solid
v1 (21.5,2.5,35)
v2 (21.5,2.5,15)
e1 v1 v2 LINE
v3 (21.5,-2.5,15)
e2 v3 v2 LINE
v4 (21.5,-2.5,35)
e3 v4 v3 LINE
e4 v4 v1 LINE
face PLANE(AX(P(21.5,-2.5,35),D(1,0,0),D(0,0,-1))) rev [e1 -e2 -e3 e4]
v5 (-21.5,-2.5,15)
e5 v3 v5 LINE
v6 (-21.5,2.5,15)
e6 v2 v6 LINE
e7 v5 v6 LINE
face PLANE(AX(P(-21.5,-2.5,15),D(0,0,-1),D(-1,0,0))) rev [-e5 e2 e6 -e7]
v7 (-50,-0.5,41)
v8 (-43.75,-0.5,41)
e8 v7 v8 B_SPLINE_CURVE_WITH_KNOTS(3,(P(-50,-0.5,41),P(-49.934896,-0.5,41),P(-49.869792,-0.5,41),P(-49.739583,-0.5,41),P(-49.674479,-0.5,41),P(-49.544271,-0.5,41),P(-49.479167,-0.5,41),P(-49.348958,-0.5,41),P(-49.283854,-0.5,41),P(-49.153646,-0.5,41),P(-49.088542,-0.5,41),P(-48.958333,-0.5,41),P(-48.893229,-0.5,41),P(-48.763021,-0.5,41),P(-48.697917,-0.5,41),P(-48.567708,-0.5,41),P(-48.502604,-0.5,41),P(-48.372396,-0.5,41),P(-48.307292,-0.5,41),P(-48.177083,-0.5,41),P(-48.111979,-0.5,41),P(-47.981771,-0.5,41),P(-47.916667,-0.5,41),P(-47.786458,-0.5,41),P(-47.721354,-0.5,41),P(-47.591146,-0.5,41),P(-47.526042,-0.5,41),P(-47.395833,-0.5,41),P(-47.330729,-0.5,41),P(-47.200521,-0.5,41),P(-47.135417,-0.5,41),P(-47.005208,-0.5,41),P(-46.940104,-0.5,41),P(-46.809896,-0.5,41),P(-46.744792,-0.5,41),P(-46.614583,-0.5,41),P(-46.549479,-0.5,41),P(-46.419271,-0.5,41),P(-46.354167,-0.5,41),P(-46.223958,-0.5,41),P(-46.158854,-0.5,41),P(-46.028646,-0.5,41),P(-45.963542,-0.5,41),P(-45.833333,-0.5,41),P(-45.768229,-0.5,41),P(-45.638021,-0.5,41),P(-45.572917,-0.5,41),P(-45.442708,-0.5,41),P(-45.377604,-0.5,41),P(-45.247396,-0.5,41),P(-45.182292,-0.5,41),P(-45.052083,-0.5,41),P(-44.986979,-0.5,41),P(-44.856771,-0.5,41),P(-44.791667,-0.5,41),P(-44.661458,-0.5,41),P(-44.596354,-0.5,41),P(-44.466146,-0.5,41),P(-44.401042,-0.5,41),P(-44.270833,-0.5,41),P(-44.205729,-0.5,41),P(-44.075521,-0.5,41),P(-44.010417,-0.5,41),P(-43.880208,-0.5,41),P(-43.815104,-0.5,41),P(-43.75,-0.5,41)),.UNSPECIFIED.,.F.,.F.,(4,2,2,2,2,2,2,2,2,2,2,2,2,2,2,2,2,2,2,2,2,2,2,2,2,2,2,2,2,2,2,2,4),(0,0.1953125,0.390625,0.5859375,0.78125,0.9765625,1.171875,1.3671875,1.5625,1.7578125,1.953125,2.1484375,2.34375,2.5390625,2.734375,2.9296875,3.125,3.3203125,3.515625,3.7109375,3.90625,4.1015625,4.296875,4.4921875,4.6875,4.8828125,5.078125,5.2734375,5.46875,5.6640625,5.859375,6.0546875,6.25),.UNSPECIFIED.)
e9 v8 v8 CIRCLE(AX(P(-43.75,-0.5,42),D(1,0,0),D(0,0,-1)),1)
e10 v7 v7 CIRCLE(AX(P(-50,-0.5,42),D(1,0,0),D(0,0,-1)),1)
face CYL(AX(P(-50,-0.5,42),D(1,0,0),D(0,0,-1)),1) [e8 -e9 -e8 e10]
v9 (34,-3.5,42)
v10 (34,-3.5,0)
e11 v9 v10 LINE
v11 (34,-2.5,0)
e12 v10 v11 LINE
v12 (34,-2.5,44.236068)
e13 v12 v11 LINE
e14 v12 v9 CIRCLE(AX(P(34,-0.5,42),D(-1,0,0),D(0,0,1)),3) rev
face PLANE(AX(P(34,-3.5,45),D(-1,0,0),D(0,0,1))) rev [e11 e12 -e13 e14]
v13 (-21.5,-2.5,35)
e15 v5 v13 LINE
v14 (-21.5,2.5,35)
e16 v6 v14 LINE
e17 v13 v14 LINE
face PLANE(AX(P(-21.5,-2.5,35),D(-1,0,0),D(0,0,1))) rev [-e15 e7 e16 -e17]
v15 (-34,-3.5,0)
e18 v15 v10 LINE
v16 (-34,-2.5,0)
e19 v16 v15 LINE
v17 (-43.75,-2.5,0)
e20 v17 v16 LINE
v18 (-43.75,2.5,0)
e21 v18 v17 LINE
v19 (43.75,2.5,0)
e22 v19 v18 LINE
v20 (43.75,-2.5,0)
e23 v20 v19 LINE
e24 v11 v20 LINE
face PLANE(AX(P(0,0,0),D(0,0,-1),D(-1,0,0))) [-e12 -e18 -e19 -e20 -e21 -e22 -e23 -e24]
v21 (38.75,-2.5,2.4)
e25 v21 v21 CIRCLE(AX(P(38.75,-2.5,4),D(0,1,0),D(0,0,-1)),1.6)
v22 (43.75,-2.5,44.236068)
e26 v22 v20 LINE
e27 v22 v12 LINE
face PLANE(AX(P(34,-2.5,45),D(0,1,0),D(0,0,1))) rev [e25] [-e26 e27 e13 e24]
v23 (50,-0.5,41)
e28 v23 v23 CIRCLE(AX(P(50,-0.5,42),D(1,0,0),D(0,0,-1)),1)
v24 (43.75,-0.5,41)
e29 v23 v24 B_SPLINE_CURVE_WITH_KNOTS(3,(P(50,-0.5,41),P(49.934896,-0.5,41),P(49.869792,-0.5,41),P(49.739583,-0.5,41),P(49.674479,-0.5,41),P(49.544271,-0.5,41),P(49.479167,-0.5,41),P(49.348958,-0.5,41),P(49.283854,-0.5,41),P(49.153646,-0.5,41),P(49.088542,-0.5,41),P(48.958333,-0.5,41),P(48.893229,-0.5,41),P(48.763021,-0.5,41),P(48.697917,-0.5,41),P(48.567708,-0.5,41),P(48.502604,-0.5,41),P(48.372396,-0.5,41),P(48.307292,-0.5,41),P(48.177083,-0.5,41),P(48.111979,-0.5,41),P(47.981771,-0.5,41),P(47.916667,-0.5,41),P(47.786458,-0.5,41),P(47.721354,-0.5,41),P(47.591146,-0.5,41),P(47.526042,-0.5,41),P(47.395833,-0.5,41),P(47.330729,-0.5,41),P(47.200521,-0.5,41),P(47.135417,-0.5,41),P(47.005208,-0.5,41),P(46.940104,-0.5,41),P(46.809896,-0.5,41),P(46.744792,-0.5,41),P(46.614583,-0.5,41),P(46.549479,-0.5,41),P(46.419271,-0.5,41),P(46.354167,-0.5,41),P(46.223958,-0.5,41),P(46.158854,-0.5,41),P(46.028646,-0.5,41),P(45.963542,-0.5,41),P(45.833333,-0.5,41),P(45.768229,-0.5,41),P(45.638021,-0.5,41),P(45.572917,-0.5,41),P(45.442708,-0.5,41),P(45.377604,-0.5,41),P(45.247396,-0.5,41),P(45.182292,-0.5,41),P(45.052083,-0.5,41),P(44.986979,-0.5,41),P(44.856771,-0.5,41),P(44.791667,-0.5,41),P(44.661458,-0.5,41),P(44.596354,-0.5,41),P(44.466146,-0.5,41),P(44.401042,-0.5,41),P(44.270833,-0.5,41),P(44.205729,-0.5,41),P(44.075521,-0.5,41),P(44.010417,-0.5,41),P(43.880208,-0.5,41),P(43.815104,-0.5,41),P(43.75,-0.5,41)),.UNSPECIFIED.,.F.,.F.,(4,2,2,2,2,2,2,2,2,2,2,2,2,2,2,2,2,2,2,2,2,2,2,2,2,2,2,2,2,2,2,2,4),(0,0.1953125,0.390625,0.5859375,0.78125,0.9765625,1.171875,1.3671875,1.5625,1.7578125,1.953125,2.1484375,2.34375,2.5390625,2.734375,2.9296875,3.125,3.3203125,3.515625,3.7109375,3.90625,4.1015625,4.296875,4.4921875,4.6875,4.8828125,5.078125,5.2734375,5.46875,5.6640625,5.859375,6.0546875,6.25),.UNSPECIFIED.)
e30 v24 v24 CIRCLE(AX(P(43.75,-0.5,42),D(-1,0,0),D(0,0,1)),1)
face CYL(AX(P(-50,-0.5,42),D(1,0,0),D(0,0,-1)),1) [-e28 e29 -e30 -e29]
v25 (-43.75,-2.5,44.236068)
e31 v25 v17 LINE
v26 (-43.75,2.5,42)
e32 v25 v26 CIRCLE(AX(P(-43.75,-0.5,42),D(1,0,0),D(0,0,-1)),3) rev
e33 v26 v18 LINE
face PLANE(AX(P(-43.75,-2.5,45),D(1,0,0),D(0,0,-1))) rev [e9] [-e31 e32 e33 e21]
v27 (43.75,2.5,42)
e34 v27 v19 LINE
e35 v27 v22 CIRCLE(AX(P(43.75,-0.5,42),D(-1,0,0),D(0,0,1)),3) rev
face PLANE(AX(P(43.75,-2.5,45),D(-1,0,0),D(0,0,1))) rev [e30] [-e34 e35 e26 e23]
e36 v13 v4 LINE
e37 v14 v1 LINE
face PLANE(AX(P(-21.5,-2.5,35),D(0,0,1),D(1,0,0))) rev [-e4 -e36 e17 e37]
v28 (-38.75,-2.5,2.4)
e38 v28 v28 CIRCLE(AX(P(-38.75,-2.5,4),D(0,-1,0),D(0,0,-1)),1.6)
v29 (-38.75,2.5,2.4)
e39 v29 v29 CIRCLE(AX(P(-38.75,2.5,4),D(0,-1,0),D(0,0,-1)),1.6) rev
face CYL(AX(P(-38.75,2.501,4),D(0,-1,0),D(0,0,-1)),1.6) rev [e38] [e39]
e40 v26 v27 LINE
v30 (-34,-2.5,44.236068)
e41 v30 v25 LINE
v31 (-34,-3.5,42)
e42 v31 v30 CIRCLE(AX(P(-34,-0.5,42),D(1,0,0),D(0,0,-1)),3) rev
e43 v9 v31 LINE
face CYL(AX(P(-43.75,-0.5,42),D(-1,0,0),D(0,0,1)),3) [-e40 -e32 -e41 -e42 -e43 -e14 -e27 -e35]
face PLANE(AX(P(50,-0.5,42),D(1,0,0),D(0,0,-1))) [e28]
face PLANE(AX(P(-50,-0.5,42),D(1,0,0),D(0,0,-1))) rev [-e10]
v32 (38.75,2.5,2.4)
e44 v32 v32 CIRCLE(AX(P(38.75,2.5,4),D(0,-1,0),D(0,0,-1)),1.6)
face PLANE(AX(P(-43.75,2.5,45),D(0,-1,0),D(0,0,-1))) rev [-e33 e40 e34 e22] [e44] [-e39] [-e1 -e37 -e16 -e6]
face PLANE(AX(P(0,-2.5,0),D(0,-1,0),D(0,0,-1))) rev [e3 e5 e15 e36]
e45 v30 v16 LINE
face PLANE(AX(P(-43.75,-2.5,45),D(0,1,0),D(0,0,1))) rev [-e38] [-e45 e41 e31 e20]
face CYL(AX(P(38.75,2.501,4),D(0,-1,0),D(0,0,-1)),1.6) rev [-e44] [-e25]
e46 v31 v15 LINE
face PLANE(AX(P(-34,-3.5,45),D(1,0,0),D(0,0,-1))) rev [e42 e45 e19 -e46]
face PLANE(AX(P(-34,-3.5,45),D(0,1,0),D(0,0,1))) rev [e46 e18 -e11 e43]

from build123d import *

# Parameters (mm, degrees)
EXTRUDE_1_DEPTH     = 45
SKETCH_2_W          = 43
SKETCH_2_H          = 20
CUT_EXTRUDE_2_DEPTH = 5
FILLET_2_R          = 3
EXTRUDE_START       = -43.75
SKETCH_4_R          = 1
EXTRUDE_2_DEPTH     = 50
CUT_EXTRUDE_3_REACH = 69.454
SKETCH_5_R          = 1.6


with BuildPart() as part:
    # 草图1 → 凸台-拉伸1 (new body)
    with BuildSketch(Plane.XY):
        Polygon((34, -2.5), (43.75, -2.5), (43.75, 2.5), (-43.75, 2.5), (-43.75, -2.5), (-34, -2.5), (-34, -3.5), (34, -3.5), align=None)
    extrude(amount=EXTRUDE_1_DEPTH)

    # 草图2 → 切除-拉伸2 (cut)
    with BuildSketch(Plane(origin=(0, 2.5, 0), x_dir=(1, 0, 0), z_dir=(0, 1, 0))):
        with Locations((0, -25)):
            Rectangle(SKETCH_2_W, SKETCH_2_H)
    extrude(amount=-CUT_EXTRUDE_2_DEPTH, mode=Mode.SUBTRACT)

    # 圆角2
    fillet_2_edges = [part.edges().sort_by_distance(p)[0] for p in [
        (0, -3.5, 45),
        (0, 2.5, 45),
    ]]
    fillet(fillet_2_edges, radius=FILLET_2_R - 0.0001)  # a hair under: the kernel refuses the full size

    # 草图4 → 凸台-拉伸2 (add, symmetric)
    with BuildSketch(Plane.ZY.offset(43.75).offset(EXTRUDE_START)):
        with Locations(Location((42, -0.5, 0), (0, 0, 180))):
            Circle(SKETCH_4_R)
    extrude(amount=EXTRUDE_2_DEPTH, both=True)

    # 草图5 → 切除-拉伸3 (cut, up to next)
    with BuildSketch(Plane.XZ.offset(2.5), mode=Mode.PRIVATE) as cut_extrude_3_sk1:
        with Locations(Location((-38.75, 4, 0), (0, 0, 270))):
            Circle(SKETCH_5_R)
    cut_extrude_3_tool1 = extrude(cut_extrude_3_sk1.sketch, amount=-CUT_EXTRUDE_3_REACH, mode=Mode.PRIVATE) & part.part
    cut_extrude_3 = cut_extrude_3_tool1.solids().sort_by_distance((-38.75, -2.5, 4))[0]
    add(cut_extrude_3, mode=Mode.SUBTRACT)

    # 镜向1: 切除-拉伸3 across plane
    add(cut_extrude_3.mirror(Plane(origin=(0, 0, 0), x_dir=(0, 0, 1), z_dir=(1, 0, 0))), mode=Mode.SUBTRACT)


solid = part.part
